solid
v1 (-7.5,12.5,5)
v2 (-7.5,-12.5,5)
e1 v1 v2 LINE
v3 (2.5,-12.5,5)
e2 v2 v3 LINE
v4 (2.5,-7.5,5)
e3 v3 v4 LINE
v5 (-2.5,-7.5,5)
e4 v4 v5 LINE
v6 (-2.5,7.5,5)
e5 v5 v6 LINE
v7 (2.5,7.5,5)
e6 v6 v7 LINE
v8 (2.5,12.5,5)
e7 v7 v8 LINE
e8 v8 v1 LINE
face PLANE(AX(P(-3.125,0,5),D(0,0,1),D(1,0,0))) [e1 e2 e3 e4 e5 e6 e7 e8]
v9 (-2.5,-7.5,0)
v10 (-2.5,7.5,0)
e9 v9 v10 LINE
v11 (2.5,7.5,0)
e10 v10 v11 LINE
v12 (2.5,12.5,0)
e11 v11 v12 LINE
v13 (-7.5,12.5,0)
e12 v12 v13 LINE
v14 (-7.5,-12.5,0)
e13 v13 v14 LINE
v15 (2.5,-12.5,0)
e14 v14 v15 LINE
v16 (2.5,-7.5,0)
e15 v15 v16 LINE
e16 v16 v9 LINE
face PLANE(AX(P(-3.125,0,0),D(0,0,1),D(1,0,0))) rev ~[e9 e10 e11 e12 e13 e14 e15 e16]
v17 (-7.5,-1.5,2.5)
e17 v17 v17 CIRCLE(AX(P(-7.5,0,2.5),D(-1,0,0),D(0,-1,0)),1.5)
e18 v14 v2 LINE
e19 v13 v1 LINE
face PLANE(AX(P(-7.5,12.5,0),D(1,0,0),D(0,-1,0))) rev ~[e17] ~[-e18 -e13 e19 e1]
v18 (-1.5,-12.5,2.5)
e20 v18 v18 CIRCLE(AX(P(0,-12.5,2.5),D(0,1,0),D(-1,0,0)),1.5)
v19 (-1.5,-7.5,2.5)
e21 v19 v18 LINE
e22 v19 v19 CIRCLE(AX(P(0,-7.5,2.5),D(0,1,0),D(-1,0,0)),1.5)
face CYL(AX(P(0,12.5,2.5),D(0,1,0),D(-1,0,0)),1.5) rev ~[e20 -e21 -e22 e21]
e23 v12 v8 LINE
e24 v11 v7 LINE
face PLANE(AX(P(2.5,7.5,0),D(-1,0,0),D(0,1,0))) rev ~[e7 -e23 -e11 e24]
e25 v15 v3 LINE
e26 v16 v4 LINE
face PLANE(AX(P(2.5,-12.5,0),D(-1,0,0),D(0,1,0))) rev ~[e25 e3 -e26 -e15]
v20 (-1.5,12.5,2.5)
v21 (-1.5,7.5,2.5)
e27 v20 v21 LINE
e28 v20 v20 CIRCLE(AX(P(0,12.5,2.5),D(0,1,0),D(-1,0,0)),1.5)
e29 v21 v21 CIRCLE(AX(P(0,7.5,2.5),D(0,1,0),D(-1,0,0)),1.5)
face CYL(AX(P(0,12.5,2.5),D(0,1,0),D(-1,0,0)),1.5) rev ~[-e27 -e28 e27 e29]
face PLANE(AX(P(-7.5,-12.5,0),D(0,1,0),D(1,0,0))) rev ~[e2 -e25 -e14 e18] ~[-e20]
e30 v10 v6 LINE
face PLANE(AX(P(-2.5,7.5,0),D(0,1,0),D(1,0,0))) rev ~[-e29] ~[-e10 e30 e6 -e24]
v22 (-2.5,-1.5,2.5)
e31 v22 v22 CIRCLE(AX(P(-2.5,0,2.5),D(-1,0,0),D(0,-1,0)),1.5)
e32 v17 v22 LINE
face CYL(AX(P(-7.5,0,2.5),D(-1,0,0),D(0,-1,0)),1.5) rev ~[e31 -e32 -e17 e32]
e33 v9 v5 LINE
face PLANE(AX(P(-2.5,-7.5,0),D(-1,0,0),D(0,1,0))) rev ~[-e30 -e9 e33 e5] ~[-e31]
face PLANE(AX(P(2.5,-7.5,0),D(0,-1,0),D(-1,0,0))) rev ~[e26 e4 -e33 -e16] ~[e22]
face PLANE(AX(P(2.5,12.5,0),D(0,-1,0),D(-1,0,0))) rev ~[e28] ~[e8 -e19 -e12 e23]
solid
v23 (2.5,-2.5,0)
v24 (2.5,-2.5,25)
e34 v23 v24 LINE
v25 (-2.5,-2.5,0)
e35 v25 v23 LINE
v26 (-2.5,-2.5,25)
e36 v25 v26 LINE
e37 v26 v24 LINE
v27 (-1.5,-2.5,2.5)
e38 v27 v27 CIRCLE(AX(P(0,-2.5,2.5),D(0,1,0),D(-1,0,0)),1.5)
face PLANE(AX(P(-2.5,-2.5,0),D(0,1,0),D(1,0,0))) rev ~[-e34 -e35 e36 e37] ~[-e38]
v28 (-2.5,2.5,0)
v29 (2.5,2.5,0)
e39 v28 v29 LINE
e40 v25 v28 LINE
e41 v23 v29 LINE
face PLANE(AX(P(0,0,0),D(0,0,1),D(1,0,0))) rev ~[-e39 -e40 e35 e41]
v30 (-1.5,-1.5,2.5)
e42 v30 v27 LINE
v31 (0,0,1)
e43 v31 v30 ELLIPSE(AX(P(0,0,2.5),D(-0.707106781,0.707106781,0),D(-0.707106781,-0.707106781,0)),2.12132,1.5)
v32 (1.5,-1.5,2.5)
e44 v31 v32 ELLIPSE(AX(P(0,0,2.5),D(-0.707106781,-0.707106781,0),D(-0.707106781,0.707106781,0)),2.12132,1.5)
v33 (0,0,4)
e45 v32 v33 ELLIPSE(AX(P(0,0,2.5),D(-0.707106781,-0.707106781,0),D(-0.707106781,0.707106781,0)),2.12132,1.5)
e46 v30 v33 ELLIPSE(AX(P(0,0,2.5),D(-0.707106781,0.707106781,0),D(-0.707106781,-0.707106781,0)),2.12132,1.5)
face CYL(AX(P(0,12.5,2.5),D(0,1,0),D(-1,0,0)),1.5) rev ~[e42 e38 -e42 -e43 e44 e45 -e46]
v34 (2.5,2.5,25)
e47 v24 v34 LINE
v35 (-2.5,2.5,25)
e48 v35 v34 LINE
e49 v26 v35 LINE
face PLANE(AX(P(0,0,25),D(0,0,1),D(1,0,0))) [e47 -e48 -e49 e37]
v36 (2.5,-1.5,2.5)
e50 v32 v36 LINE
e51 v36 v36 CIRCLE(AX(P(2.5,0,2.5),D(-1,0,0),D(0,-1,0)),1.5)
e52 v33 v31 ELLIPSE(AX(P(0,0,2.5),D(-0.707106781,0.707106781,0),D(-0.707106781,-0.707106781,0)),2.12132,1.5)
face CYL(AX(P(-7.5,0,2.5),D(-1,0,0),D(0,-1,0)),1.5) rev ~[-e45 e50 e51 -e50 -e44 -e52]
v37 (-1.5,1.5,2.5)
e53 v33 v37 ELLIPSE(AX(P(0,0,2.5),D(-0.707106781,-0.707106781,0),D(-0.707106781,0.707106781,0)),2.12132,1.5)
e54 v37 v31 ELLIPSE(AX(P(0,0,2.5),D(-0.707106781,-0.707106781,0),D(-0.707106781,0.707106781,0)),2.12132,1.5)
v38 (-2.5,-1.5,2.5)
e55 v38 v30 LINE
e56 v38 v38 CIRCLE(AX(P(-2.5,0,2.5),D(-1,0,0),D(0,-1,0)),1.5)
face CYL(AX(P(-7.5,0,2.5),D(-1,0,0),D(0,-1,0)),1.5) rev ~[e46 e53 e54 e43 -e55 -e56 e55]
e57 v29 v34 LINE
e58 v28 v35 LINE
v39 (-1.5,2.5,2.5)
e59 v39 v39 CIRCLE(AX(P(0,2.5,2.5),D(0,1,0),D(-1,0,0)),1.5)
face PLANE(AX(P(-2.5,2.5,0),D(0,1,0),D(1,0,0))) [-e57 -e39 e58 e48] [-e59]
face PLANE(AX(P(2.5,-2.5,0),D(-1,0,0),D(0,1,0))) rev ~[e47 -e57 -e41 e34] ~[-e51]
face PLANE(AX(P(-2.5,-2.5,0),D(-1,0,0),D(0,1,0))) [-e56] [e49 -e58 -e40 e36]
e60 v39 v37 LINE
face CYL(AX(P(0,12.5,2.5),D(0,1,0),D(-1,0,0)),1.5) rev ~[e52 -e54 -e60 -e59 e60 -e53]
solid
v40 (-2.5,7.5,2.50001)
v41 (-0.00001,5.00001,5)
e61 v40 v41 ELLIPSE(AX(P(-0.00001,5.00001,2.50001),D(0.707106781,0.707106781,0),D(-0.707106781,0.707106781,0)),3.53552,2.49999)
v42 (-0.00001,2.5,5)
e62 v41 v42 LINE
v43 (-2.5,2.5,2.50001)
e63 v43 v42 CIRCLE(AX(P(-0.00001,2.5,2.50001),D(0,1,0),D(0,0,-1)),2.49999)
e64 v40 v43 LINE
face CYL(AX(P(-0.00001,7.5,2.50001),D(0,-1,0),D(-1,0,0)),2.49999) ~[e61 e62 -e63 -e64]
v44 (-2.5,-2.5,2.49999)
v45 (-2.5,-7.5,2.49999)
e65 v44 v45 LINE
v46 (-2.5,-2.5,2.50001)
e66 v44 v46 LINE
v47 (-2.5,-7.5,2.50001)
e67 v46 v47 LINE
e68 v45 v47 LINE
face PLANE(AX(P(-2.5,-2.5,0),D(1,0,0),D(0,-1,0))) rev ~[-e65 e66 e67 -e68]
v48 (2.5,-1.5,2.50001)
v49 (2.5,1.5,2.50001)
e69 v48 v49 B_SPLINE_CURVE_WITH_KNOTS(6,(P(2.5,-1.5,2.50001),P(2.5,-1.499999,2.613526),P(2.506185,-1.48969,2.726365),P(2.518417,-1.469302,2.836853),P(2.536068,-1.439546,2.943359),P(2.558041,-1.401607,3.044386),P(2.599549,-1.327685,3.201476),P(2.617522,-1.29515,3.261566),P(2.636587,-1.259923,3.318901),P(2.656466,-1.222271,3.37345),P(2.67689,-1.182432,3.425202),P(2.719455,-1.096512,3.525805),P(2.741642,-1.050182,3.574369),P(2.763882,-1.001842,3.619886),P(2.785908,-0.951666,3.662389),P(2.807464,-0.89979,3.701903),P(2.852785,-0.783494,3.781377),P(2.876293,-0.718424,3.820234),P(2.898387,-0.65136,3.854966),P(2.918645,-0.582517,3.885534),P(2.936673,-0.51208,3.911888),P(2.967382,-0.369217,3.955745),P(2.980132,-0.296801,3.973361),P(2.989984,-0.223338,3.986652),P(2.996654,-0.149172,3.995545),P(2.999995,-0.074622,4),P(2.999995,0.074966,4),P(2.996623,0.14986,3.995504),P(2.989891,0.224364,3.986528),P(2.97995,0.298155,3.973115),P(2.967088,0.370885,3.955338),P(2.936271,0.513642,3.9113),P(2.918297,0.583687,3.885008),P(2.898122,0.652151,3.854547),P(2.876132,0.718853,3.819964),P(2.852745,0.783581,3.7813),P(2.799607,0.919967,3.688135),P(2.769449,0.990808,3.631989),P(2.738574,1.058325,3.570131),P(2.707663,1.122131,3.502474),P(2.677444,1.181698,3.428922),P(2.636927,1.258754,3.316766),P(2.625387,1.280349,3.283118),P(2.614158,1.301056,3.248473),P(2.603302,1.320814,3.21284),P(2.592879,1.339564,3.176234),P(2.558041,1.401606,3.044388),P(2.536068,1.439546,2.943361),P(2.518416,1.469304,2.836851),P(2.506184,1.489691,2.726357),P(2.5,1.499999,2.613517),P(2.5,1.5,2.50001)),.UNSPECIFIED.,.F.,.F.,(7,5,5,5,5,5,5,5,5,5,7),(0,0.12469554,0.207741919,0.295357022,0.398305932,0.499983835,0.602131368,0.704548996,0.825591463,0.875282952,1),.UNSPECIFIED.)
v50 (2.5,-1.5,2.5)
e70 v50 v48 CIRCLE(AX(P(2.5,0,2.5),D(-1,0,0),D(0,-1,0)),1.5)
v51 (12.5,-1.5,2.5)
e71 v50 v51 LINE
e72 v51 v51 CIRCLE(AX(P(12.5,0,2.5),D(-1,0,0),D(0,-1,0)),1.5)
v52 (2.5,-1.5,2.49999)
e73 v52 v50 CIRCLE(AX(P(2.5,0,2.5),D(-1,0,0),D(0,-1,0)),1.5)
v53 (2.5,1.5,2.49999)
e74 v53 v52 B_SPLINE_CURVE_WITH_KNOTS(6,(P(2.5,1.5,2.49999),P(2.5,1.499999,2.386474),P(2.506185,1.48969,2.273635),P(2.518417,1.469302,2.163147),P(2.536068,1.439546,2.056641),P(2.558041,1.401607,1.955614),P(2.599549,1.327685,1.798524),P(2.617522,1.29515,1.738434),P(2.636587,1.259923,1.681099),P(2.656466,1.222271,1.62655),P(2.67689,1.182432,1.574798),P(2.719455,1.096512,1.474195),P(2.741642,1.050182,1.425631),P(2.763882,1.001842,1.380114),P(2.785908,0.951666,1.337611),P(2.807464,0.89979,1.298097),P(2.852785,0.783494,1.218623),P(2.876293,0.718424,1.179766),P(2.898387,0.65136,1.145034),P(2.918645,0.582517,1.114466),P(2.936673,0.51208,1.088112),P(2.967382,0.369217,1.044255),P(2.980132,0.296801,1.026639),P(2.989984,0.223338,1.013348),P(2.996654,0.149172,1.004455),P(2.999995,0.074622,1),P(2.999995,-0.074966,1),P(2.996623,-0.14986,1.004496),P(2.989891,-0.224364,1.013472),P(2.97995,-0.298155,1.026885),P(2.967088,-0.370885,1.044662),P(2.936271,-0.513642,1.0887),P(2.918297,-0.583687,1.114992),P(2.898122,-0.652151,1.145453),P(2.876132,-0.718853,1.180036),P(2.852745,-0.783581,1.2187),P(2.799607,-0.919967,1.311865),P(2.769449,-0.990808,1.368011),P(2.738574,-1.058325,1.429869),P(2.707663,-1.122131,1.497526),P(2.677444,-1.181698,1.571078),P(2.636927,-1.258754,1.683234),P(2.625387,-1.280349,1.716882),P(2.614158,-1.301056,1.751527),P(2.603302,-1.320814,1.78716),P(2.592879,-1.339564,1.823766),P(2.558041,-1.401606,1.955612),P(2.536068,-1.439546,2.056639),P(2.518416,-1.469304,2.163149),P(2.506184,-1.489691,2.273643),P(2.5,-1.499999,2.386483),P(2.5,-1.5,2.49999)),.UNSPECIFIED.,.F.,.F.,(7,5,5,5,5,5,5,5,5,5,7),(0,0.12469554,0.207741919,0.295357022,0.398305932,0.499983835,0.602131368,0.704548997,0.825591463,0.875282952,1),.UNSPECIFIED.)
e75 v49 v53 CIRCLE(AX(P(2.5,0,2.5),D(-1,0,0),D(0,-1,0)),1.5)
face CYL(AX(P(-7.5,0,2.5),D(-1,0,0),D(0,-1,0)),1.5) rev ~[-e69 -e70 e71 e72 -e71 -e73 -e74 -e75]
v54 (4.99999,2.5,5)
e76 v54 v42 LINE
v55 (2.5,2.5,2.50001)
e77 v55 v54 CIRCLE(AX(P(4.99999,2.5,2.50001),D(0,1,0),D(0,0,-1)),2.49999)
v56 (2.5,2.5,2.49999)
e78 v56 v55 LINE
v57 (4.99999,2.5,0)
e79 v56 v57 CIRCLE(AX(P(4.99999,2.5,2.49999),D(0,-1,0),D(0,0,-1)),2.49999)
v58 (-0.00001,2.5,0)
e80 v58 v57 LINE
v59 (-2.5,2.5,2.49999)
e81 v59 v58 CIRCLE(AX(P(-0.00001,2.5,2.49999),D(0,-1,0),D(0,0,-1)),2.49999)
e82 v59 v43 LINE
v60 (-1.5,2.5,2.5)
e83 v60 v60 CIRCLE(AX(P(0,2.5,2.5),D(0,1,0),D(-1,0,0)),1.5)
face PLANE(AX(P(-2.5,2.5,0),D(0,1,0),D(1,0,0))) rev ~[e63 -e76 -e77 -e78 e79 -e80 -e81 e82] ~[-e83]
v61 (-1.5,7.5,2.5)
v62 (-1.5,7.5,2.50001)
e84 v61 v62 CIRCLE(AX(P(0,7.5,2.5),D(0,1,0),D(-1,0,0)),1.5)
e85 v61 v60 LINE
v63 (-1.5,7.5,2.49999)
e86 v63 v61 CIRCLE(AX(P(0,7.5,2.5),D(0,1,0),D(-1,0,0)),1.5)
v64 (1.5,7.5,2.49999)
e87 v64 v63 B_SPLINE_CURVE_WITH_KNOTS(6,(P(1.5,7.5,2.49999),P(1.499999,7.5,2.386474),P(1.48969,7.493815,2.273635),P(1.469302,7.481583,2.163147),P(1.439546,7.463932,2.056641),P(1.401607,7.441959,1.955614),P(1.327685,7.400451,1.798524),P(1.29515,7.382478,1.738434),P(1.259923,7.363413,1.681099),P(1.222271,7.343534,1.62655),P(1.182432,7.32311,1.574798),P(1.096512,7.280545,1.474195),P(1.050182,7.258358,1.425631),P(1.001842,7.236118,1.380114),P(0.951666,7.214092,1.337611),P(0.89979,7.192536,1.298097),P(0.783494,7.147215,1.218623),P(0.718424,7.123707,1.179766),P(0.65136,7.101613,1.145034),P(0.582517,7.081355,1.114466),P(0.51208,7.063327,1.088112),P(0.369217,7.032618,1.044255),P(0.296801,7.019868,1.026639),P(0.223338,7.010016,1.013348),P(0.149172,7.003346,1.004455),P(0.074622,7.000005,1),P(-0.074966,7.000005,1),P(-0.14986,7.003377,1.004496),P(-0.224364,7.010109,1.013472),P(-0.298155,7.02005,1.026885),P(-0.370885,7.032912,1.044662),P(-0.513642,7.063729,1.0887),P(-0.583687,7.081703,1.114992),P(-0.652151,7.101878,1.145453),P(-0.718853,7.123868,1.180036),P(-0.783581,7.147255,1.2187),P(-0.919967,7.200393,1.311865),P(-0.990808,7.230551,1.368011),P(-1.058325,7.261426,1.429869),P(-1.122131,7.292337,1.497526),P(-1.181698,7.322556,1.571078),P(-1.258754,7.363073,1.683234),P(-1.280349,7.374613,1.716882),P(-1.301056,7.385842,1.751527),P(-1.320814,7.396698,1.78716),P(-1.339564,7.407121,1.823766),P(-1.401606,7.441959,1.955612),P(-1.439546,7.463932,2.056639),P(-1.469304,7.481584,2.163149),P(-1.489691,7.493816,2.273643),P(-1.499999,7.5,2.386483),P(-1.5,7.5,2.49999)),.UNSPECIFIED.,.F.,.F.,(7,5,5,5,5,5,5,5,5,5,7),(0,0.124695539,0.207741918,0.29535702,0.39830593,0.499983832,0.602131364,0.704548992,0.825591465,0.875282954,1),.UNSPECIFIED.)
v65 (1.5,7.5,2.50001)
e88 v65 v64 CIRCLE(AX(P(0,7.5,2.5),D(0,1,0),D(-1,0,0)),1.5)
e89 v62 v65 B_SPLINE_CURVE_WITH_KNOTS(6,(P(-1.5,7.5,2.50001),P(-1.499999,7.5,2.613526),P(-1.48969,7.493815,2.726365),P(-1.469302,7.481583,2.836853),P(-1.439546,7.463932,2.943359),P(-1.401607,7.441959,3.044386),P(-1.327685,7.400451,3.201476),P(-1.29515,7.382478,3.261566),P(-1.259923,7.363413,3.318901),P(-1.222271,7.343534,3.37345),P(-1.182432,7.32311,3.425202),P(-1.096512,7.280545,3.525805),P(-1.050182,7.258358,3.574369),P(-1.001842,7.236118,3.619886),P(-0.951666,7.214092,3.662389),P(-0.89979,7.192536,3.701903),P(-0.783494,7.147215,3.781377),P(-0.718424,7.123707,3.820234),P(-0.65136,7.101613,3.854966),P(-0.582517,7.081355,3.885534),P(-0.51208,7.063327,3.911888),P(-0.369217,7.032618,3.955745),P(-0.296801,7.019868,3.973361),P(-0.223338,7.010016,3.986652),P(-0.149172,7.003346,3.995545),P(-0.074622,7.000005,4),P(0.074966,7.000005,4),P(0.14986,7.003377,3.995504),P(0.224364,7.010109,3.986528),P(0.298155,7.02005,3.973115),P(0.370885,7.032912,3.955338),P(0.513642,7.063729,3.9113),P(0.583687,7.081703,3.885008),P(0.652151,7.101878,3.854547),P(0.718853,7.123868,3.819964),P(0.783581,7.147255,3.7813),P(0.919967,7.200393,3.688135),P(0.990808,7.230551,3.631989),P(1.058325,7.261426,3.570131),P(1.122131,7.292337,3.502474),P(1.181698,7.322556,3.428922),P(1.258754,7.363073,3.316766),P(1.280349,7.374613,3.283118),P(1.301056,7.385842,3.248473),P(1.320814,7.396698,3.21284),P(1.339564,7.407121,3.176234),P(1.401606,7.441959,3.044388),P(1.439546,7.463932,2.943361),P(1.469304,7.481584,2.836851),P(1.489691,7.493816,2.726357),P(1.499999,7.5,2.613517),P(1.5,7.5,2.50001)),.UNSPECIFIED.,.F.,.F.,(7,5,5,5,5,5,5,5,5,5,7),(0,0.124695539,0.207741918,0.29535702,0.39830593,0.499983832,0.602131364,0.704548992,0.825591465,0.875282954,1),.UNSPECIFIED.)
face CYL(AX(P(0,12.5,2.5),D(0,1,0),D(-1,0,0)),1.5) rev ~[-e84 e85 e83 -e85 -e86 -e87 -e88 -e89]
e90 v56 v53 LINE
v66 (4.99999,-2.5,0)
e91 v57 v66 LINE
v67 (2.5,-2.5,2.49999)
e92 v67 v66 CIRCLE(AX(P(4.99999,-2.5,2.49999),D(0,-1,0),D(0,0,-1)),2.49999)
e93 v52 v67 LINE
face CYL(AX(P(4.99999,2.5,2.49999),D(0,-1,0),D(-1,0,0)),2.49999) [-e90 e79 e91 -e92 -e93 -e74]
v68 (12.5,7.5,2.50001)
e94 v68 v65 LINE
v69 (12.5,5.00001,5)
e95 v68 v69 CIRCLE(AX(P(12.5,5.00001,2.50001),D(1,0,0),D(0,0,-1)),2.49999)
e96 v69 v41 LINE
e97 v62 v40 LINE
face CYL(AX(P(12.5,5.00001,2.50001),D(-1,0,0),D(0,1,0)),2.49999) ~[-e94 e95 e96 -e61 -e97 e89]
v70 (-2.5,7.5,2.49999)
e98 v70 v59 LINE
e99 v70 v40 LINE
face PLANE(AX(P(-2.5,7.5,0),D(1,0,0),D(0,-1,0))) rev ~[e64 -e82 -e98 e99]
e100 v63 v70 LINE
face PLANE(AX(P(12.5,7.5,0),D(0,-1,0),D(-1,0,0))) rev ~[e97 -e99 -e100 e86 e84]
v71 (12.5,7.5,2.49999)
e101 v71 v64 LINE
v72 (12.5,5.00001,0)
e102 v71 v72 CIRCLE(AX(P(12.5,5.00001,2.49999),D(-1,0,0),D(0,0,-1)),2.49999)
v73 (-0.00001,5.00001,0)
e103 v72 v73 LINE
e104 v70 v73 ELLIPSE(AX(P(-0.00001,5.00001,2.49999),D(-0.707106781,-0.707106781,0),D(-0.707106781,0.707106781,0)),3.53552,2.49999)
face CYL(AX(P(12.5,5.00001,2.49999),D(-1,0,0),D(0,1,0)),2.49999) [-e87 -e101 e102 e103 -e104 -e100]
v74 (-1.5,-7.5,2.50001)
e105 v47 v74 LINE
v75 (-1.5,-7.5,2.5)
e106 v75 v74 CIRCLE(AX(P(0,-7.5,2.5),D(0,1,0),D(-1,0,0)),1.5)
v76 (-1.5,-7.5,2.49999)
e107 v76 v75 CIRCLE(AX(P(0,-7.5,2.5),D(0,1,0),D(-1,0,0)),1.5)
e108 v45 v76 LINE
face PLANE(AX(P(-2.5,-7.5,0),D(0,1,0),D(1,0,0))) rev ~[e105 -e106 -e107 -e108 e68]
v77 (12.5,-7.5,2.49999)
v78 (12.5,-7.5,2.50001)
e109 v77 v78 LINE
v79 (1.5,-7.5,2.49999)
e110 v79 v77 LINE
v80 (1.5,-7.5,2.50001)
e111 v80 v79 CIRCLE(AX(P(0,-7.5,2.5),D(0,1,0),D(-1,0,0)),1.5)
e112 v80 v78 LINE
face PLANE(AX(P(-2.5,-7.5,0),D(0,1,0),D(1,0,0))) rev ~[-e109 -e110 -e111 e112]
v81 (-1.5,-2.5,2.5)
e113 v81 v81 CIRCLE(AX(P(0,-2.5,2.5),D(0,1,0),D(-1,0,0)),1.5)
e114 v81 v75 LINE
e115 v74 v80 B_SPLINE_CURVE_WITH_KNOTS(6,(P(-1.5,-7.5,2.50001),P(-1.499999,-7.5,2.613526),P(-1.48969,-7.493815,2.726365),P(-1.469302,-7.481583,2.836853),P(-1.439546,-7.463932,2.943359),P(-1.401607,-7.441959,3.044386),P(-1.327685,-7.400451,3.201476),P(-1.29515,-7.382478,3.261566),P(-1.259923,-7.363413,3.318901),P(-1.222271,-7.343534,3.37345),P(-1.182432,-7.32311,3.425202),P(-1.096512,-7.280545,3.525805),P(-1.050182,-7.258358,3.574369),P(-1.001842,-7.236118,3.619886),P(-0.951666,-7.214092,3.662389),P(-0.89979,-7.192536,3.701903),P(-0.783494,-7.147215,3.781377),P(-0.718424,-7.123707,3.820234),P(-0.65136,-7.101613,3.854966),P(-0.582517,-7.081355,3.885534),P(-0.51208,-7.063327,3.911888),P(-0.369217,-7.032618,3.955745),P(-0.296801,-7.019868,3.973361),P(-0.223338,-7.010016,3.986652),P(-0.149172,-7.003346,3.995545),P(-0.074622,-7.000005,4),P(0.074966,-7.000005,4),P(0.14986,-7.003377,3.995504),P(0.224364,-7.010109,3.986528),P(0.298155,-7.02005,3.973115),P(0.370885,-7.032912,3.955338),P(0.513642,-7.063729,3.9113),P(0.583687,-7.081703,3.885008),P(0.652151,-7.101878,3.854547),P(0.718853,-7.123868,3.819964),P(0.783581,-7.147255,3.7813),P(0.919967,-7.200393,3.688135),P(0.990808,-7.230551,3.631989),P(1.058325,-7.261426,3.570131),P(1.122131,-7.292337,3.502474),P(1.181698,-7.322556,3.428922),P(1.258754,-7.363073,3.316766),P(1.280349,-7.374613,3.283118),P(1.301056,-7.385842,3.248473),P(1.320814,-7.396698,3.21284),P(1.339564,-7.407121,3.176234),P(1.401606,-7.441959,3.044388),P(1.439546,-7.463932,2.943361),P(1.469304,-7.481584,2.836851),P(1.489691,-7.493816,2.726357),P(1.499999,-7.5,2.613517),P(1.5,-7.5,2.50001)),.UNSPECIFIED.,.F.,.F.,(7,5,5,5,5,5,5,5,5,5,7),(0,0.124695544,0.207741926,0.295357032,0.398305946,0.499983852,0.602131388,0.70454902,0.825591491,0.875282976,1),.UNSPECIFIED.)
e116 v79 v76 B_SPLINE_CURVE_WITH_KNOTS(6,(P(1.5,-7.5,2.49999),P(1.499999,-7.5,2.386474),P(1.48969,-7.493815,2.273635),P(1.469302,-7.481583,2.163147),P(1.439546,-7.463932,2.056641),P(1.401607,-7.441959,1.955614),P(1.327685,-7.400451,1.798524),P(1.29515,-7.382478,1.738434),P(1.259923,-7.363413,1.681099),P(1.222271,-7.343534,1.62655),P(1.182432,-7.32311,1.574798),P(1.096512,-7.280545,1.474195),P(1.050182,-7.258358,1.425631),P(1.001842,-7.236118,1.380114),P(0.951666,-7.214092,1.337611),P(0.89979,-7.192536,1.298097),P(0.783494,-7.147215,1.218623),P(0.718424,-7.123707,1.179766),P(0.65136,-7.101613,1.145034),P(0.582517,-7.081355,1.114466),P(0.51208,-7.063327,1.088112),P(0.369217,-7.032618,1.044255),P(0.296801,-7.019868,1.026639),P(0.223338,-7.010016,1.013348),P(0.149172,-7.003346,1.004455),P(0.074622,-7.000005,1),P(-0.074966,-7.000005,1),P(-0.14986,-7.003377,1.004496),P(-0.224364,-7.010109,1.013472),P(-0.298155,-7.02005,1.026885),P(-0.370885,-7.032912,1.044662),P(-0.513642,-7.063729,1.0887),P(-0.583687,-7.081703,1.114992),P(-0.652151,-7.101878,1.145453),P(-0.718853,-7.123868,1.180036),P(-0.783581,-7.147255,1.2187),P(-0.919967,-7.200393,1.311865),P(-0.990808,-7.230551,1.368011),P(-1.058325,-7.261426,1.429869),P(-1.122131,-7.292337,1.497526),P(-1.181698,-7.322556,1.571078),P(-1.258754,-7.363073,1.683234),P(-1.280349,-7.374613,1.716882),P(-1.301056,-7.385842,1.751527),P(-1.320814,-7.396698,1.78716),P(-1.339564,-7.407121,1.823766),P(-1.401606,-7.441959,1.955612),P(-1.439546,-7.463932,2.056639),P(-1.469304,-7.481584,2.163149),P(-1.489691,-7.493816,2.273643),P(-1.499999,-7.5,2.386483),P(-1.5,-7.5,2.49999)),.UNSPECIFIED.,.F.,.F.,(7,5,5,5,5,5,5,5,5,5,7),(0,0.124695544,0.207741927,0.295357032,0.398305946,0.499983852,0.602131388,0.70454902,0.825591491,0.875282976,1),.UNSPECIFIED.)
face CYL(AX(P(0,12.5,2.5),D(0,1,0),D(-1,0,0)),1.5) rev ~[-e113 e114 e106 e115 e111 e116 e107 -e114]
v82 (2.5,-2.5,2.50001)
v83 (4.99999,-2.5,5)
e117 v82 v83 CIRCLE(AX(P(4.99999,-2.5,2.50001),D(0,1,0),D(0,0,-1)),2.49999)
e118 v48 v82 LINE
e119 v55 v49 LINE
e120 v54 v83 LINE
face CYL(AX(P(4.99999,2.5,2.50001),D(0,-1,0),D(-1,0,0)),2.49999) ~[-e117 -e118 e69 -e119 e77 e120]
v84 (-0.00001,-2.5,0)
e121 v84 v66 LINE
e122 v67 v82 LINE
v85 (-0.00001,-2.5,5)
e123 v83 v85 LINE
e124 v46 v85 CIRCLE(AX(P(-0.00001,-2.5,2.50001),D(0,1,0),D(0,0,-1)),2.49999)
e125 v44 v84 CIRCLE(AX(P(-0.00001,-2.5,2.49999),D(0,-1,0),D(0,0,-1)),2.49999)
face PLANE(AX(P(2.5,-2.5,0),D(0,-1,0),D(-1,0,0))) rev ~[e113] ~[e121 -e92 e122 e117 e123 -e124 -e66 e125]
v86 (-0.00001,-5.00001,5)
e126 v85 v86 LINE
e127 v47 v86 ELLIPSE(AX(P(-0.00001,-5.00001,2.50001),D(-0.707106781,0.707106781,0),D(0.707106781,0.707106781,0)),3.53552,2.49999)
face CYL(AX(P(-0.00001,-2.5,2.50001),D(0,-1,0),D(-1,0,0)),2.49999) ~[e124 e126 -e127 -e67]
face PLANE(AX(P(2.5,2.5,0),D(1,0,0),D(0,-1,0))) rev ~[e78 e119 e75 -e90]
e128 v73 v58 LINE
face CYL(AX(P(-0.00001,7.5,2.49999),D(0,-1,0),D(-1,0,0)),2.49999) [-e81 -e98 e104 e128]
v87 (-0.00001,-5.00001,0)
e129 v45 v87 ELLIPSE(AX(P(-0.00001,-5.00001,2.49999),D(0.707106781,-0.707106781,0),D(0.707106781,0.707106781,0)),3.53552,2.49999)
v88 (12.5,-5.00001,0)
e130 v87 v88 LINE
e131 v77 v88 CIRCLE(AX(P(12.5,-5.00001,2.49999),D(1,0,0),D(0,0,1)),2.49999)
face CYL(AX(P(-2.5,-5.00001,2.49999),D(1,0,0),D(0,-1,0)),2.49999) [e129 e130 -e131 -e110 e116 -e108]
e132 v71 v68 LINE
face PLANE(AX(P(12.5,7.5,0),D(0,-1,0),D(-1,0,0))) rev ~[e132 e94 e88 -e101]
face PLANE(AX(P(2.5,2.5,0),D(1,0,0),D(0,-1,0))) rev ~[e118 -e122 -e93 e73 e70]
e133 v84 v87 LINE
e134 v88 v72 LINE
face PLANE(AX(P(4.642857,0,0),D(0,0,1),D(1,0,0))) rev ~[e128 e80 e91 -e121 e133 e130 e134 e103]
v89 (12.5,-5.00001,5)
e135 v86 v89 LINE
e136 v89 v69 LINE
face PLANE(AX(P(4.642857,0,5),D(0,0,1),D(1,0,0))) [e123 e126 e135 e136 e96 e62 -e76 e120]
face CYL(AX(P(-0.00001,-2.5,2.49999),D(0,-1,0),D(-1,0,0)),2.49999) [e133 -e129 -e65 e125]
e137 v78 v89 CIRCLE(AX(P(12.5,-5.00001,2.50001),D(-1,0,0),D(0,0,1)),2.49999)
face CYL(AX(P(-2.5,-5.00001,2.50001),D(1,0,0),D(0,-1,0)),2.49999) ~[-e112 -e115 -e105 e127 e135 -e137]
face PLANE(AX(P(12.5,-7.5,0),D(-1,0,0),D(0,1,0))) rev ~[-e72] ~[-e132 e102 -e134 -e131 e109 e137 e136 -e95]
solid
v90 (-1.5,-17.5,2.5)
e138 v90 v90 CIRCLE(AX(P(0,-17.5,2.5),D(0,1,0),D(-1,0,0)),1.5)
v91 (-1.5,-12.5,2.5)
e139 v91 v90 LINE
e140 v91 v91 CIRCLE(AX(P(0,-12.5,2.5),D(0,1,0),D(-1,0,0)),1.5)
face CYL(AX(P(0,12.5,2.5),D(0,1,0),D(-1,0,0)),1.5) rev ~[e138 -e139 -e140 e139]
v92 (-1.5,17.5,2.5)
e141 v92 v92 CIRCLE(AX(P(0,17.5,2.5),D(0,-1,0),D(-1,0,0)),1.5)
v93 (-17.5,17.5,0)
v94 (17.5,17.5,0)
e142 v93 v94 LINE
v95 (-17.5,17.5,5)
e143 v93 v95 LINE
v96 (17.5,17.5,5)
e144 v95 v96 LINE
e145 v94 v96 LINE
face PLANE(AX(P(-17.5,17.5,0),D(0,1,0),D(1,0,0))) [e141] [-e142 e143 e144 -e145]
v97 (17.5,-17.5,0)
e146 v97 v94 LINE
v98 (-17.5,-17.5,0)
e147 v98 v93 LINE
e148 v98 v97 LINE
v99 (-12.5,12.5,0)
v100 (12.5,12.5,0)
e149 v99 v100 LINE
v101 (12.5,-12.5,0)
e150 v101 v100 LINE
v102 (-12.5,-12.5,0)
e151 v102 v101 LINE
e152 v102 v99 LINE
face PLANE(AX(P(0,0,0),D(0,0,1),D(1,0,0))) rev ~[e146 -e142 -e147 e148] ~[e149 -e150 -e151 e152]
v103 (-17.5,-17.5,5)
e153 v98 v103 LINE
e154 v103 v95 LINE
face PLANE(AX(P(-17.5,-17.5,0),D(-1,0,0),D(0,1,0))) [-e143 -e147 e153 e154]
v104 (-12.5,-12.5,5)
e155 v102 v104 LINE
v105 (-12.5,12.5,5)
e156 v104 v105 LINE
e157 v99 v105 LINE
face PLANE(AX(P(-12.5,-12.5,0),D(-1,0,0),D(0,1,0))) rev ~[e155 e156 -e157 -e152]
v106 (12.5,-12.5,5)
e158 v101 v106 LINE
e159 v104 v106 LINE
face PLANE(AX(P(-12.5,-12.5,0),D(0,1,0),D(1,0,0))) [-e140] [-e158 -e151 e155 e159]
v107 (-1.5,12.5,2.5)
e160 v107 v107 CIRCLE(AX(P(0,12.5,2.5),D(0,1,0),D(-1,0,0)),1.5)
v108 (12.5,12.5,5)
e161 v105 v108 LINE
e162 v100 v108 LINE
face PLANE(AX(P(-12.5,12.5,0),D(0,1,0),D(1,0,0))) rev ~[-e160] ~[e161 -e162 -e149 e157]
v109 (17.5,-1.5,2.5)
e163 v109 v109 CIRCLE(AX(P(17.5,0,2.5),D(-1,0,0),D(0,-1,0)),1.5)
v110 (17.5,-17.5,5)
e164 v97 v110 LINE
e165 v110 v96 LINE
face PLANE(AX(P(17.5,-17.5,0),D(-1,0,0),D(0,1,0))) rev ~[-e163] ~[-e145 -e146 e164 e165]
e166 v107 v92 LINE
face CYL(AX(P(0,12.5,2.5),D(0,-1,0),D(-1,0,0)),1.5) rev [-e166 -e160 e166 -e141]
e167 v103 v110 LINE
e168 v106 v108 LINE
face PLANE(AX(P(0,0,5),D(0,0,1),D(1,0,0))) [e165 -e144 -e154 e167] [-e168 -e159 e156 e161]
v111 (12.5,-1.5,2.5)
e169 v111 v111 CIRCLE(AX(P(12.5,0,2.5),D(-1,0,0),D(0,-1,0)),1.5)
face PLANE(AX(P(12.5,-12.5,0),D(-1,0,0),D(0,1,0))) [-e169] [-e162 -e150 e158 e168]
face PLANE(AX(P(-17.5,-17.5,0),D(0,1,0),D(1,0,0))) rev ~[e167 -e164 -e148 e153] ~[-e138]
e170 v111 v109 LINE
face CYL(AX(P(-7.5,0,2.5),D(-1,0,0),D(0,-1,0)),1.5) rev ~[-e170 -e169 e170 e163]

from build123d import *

# Parameters (mm, degrees)
F1_DEPTH       = 5
F2_DEPTH       = 5
F0_W           = 5
F0_H           = 5
F3_DEPTH       = 25
F4_R           = 2.49999
F5_W           = 35
F5_H           = 35
F5_W_2         = 25
F5_H_2         = 25
F6_DEPTH       = 5
F7_R           = 1.5
F8_DEPTH       = 25.001
F9_R           = 1.5
F10_DEPTH      = 30.001
F10_DEPTH_BACK = 5.001


# Not quite as in the source:
# - a fillet or chamfer is up to 0.001 mm smaller than in the source, because OpenCascade refuses the exact size


with BuildPart() as f1:
    # F0 (on Top) → F1 (new body)
    with BuildSketch(Plane.XY):
        Polygon((-2.5, -2.5), (-2.5, 2.5), (-2.5, 7.5), (2.5, 7.5), (2.5, 12.5), (-7.5, 12.5), (-7.5, -12.5), (2.5, -12.5), (2.5, -7.5), (-2.5, -7.5), align=None)
    extrude(amount=F1_DEPTH)


with BuildPart() as f2:
    # F0 (on Top) → F2 (new body)
    with BuildSketch(Plane.XY):
        Polygon((-2.5, 7.5), (-2.5, 2.5), (2.5, 2.5), (2.5, -2.5), (-2.5, -2.5), (-2.5, -7.5), (2.5, -7.5), (12.5, -7.5), (12.5, 7.5), (2.5, 7.5), align=None)
    extrude(amount=F2_DEPTH)

    # F4 (radius 2.5 in the source; OpenCascade refuses exactly that, so slightly less here)
    f4_edges = [f2.edges().sort_by_distance(p)[0] for p in [
        (5, -7.5, 5),
        (5, -7.5, 0),
        (5, 7.5, 5),
        (5, 7.5, 0),
        (2.5, 0, 5),
        (2.5, 0, 0),
        (-2.5, 5, 5),
        (-2.5, 5, 0),
        (-2.5, -5, 0),
        (-2.5, -5, 5),
    ]]
    fillet(f4_edges, radius=F4_R)


with BuildPart() as f3:
    # F0 (on Top) → F3 (new body)
    with BuildSketch(Plane.XY):
        Rectangle(F0_W, F0_H)
    extrude(amount=F3_DEPTH)


with BuildPart() as f6:
    # F5 (on Top) → F6 (new body)
    with BuildSketch(Plane.XY):
        Rectangle(F5_W, F5_H)
        Rectangle(F5_W_2, F5_H_2, mode=Mode.SUBTRACT)
    extrude(amount=F6_DEPTH)


with BuildPart() as f8_tool:
    # F7 (on face) → F8 (new body, through all)
    with BuildSketch(Plane(origin=(-7.5, 0, 0), x_dir=(0, -1, 0), z_dir=(-1, 0, 0))):
        with Locations((0, 2.5)):
            Circle(F7_R)
    extrude(amount=-F8_DEPTH)


with BuildPart() as f1_1:
    add(f1.part)

    # F8: cut by f8_tool
    add(f8_tool.part, mode=Mode.SUBTRACT)


with BuildPart() as f2_1:
    add(f2.part)

    # F8: cut by f8_tool
    add(f8_tool.part, mode=Mode.SUBTRACT)


with BuildPart() as f3_1:
    add(f3.part)

    # F8: cut by f8_tool
    add(f8_tool.part, mode=Mode.SUBTRACT)


with BuildPart() as f6_1:
    add(f6.part)

    # F8: cut by f8_tool
    add(f8_tool.part, mode=Mode.SUBTRACT)


with BuildPart() as f10_tool:
    # F9 (on face) → F10 (new body, two sides)
    with BuildSketch(Plane(origin=(0, 12.5, 0), x_dir=(-1, 0, 0), z_dir=(0, 1, 0))) as f10_sk:
        with Locations((0, 2.5)):
            Circle(F9_R)
    extrude(amount=-F10_DEPTH)
    extrude(f10_sk.sketch, amount=F10_DEPTH_BACK)


with BuildPart() as f1_2:
    add(f1_1.part)

    # F10: cut by f10_tool
    add(f10_tool.part, mode=Mode.SUBTRACT)


with BuildPart() as f2_2:
    add(f2_1.part)

    # F10: cut by f10_tool
    add(f10_tool.part, mode=Mode.SUBTRACT)


with BuildPart() as f3_2:
    add(f3_1.part)

    # F10: cut by f10_tool
    add(f10_tool.part, mode=Mode.SUBTRACT)


with BuildPart() as f6_2:
    add(f6_1.part)

    # F10: cut by f10_tool
    add(f10_tool.part, mode=Mode.SUBTRACT)


solid = Compound([f1_2.part, f2_2.part, f3_2.part, f6_2.part])
